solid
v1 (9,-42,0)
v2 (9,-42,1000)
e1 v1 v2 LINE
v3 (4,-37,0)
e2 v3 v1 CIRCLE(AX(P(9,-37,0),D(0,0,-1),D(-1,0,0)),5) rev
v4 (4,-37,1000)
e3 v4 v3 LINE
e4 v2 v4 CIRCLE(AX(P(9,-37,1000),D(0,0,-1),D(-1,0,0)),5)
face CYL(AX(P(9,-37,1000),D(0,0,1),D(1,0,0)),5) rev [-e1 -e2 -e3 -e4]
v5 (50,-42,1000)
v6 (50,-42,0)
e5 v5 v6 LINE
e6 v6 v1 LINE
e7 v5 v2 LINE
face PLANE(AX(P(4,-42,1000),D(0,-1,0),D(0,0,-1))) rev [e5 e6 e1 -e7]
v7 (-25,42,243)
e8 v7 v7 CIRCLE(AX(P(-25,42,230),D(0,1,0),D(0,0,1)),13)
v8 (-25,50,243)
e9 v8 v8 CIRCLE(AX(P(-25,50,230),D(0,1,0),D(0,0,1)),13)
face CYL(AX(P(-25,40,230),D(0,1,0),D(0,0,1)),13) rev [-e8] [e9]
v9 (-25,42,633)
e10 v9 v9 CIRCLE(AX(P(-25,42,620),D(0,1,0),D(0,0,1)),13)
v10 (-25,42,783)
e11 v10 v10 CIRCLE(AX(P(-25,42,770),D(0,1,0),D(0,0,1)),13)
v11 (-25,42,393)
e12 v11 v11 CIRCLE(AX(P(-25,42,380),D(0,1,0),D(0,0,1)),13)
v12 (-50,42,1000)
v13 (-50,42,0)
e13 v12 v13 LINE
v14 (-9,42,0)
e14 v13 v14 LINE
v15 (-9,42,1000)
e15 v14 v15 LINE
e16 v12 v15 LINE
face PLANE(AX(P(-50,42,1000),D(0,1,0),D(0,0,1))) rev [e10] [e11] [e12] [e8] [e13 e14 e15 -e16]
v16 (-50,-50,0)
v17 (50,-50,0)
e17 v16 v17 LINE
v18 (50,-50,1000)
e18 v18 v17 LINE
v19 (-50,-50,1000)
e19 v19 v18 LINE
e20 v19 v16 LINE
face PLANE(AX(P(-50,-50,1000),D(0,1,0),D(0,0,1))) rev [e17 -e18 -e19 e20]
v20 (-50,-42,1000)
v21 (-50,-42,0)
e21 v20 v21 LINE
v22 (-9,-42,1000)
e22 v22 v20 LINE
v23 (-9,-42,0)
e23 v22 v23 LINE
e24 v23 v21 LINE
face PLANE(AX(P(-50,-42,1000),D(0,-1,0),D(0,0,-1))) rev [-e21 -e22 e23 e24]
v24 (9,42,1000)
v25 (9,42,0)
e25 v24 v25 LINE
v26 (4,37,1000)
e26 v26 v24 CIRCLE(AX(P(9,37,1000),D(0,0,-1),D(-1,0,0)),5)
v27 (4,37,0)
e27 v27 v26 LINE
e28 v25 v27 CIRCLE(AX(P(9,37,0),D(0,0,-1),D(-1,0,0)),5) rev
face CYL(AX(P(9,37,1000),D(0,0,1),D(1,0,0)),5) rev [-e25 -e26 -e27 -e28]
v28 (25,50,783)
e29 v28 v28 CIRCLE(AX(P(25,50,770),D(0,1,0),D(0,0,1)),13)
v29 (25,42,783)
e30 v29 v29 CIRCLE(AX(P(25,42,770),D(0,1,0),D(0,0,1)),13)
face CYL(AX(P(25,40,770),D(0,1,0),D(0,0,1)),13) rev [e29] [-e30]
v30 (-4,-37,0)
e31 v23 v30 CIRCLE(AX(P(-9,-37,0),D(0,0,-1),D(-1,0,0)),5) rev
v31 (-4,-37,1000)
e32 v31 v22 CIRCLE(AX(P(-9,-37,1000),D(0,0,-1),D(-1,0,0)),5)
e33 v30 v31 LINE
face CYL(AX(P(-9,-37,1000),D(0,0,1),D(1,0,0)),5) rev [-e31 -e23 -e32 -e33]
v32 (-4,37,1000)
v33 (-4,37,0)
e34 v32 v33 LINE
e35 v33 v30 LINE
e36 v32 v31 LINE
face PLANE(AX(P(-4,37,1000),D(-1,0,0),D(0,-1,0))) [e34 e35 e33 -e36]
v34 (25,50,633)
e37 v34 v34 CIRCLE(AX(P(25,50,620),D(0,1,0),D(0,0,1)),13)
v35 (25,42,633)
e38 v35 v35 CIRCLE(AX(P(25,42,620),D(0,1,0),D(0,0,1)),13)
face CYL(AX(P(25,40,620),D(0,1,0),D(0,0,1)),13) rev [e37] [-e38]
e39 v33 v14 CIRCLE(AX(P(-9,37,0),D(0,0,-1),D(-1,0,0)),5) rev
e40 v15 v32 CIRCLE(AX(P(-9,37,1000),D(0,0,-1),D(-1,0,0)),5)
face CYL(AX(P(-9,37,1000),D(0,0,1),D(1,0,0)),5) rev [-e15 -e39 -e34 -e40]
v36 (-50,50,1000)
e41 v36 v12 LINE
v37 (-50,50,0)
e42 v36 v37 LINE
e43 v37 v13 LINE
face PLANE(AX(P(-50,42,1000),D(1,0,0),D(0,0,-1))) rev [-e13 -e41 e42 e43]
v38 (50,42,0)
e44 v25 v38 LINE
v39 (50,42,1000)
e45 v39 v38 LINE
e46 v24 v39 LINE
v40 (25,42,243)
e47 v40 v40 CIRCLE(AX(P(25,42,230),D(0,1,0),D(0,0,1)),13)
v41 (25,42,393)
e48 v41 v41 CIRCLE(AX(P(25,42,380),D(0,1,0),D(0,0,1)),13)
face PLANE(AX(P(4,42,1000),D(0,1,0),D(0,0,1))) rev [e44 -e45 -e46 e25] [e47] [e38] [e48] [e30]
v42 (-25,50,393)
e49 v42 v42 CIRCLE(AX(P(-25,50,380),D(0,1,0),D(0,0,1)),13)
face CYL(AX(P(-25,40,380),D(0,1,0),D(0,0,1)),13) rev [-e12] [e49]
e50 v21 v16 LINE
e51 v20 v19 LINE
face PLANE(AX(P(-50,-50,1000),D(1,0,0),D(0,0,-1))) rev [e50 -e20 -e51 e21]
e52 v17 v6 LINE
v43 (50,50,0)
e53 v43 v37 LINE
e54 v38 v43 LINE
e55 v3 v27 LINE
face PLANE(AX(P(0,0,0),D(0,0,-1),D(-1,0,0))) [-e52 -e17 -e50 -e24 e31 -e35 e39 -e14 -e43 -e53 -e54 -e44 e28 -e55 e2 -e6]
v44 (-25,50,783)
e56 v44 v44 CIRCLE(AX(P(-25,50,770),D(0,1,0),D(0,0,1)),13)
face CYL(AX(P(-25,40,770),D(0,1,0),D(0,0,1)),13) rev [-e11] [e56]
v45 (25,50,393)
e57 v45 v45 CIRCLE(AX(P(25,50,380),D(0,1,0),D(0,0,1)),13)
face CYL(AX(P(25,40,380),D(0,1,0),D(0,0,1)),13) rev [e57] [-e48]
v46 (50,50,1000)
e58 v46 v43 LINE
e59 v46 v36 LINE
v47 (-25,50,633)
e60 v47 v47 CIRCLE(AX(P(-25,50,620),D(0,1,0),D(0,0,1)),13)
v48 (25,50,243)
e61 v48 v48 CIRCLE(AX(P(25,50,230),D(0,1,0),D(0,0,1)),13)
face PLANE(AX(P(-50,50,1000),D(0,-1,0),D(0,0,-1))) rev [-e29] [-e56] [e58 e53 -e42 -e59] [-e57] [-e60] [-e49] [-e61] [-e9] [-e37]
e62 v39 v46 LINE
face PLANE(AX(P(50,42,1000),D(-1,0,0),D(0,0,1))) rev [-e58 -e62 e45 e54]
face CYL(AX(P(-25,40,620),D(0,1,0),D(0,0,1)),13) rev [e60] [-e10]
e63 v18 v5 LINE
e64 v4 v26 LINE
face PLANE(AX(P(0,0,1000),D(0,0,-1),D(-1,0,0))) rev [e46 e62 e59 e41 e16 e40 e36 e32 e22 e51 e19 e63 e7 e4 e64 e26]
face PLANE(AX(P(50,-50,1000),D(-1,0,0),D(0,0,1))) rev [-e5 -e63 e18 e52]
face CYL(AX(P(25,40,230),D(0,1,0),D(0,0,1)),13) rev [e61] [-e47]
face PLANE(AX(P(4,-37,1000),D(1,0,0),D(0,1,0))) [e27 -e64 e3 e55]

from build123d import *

# Parameters (mm, degrees)
BOSS_EXTRUDE1_DEPTH = 1000
FILLET1_R           = 5
SKETCH2_R           = 13
CUT_EXTRUDE1_DEPTH  = 10
SKETCH3_R           = 13
CUT_EXTRUDE2_DEPTH  = 10
SKETCH4_W           = 10
SKETCH4_H           = 30
BOSS_EXTRUDE2_DEPTH = 146
SKETCH6_R           = 15
BOSS_EXTRUDE4_DEPTH = 10
SPLIT1_START        = 495
SPLIT1_OUTLINE_R    = 15
SPLIT1_DEPTH        = 10
SPLIT2_START        = 495
SPLIT2_OUTLINE_R    = 15
SPLIT2_DEPTH        = 10


# Read off the part's stored shape, not the designer's step: Split1, Split2
with BuildPart() as part:
    # Sketch1 → Boss-Extrude1 (new body)
    with BuildSketch(Plane.XY):
        Polygon((-50, 42), (-4, 42), (-4, -42), (-50, -42), (-50, -50), (50, -50), (50, -42), (4, -42), (4, 42), (50, 42), (50, 50), (-50, 50), align=None)
    extrude(amount=BOSS_EXTRUDE1_DEPTH)

    # Fillet1
    fillet1_edges = [part.edges().sort_by_distance(p)[0] for p in [
        (4, 42, 500),
        (4, -42, 500),
        (-4, -42, 500),
        (-4, 42, 500),
    ]]
    fillet(fillet1_edges, radius=FILLET1_R)

    # Sketch2 → Cut-Extrude1 (cut)
    with BuildSketch(Plane(origin=(0, 50, 0), x_dir=(1, 0, 0), z_dir=(0, 1, 0))):
        with Locations(Location((25, -770, 0), (0, 0, 270))):
            Circle(SKETCH2_R)
        with Locations(Location((-25, -770, 0), (0, 0, 270))):
            Circle(SKETCH2_R)
        with Locations(Location((25, -230, 0), (0, 0, 270))):
            Circle(SKETCH2_R)
        with Locations(Location((-25, -230, 0), (0, 0, 270))):
            Circle(SKETCH2_R)
    extrude(amount=-CUT_EXTRUDE1_DEPTH, mode=Mode.SUBTRACT)

    # Sketch3 → Cut-Extrude2 (cut)
    with BuildSketch(Plane(origin=(0, 50, 0), x_dir=(1, 0, 0), z_dir=(0, 1, 0))):
        with Locations(Location((-25, -620, 0), (0, 0, 270))):
            Circle(SKETCH3_R)
        with Locations(Location((25, -620, 0), (0, 0, 270))):
            Circle(SKETCH3_R)
        with Locations(Location((25, -380, 0), (0, 0, 270))):
            Circle(SKETCH3_R)
        with Locations(Location((-25, -380, 0), (0, 0, 270))):
            Circle(SKETCH3_R)
    extrude(amount=-CUT_EXTRUDE2_DEPTH, mode=Mode.SUBTRACT)

    # Sketch4 → Boss-Extrude2 (add)
    with BuildSketch(Plane(origin=(4, 0, 0), x_dir=(0, 0, -1), z_dir=(1, 0, 0))):
        with Locations((-500, -5.392878346)):
            Rectangle(SKETCH4_W, SKETCH4_H)
    boss_extrude2 = extrude(amount=BOSS_EXTRUDE2_DEPTH)

    # Sketch6 → Boss-Extrude4 (add)
    with BuildSketch(Plane.XY.offset(505)):
        Polygon((150, 9.607121654), (150, -70.392878346), (180, -70.392878346), (220, -20.392878346), (220, 9.607121654), align=None)
        with Locations((185, -10.392878346)):
            Circle(SKETCH6_R, mode=Mode.SUBTRACT)
    boss_extrude4 = extrude(amount=-BOSS_EXTRUDE4_DEPTH)

    # Mirror1: Boss-Extrude2, Boss-Extrude4 across plane
    add(boss_extrude2.mirror(Plane(origin=(0, 0, 0), x_dir=(0, 0, 1), z_dir=(1, 0, 0))))
    add(boss_extrude4.mirror(Plane(origin=(0, 0, 0), x_dir=(0, 0, 1), z_dir=(1, 0, 0))))

    # Split1 outline → Split1 (cut)
    with BuildSketch(Plane.XY.offset(SPLIT1_START)):
        Polygon((-150, -20.392878346), (-4, -20.392878346), (-4, 9.607121654), (-220, 9.607121654), (-220, -20.392878346), (-180, -70.392878346), (-150, -70.392878346), align=None)
        with Locations((-185, -10.392878346)):
            Circle(SPLIT1_OUTLINE_R, mode=Mode.SUBTRACT)
    extrude(amount=SPLIT1_DEPTH, mode=Mode.SUBTRACT)

    # Split2 outline → Split2 (cut)
    with BuildSketch(Plane.XY.offset(SPLIT2_START)):
        Polygon((4, -20.392878346), (150, -20.392878346), (150, -70.392878346), (180, -70.392878346), (220, -20.392878346), (220, 9.607121654), (4, 9.607121654), align=None)
        with Locations((185, -10.392878346)):
            Circle(SPLIT2_OUTLINE_R, mode=Mode.SUBTRACT)
    extrude(amount=SPLIT2_DEPTH, mode=Mode.SUBTRACT)


solid = part.part
